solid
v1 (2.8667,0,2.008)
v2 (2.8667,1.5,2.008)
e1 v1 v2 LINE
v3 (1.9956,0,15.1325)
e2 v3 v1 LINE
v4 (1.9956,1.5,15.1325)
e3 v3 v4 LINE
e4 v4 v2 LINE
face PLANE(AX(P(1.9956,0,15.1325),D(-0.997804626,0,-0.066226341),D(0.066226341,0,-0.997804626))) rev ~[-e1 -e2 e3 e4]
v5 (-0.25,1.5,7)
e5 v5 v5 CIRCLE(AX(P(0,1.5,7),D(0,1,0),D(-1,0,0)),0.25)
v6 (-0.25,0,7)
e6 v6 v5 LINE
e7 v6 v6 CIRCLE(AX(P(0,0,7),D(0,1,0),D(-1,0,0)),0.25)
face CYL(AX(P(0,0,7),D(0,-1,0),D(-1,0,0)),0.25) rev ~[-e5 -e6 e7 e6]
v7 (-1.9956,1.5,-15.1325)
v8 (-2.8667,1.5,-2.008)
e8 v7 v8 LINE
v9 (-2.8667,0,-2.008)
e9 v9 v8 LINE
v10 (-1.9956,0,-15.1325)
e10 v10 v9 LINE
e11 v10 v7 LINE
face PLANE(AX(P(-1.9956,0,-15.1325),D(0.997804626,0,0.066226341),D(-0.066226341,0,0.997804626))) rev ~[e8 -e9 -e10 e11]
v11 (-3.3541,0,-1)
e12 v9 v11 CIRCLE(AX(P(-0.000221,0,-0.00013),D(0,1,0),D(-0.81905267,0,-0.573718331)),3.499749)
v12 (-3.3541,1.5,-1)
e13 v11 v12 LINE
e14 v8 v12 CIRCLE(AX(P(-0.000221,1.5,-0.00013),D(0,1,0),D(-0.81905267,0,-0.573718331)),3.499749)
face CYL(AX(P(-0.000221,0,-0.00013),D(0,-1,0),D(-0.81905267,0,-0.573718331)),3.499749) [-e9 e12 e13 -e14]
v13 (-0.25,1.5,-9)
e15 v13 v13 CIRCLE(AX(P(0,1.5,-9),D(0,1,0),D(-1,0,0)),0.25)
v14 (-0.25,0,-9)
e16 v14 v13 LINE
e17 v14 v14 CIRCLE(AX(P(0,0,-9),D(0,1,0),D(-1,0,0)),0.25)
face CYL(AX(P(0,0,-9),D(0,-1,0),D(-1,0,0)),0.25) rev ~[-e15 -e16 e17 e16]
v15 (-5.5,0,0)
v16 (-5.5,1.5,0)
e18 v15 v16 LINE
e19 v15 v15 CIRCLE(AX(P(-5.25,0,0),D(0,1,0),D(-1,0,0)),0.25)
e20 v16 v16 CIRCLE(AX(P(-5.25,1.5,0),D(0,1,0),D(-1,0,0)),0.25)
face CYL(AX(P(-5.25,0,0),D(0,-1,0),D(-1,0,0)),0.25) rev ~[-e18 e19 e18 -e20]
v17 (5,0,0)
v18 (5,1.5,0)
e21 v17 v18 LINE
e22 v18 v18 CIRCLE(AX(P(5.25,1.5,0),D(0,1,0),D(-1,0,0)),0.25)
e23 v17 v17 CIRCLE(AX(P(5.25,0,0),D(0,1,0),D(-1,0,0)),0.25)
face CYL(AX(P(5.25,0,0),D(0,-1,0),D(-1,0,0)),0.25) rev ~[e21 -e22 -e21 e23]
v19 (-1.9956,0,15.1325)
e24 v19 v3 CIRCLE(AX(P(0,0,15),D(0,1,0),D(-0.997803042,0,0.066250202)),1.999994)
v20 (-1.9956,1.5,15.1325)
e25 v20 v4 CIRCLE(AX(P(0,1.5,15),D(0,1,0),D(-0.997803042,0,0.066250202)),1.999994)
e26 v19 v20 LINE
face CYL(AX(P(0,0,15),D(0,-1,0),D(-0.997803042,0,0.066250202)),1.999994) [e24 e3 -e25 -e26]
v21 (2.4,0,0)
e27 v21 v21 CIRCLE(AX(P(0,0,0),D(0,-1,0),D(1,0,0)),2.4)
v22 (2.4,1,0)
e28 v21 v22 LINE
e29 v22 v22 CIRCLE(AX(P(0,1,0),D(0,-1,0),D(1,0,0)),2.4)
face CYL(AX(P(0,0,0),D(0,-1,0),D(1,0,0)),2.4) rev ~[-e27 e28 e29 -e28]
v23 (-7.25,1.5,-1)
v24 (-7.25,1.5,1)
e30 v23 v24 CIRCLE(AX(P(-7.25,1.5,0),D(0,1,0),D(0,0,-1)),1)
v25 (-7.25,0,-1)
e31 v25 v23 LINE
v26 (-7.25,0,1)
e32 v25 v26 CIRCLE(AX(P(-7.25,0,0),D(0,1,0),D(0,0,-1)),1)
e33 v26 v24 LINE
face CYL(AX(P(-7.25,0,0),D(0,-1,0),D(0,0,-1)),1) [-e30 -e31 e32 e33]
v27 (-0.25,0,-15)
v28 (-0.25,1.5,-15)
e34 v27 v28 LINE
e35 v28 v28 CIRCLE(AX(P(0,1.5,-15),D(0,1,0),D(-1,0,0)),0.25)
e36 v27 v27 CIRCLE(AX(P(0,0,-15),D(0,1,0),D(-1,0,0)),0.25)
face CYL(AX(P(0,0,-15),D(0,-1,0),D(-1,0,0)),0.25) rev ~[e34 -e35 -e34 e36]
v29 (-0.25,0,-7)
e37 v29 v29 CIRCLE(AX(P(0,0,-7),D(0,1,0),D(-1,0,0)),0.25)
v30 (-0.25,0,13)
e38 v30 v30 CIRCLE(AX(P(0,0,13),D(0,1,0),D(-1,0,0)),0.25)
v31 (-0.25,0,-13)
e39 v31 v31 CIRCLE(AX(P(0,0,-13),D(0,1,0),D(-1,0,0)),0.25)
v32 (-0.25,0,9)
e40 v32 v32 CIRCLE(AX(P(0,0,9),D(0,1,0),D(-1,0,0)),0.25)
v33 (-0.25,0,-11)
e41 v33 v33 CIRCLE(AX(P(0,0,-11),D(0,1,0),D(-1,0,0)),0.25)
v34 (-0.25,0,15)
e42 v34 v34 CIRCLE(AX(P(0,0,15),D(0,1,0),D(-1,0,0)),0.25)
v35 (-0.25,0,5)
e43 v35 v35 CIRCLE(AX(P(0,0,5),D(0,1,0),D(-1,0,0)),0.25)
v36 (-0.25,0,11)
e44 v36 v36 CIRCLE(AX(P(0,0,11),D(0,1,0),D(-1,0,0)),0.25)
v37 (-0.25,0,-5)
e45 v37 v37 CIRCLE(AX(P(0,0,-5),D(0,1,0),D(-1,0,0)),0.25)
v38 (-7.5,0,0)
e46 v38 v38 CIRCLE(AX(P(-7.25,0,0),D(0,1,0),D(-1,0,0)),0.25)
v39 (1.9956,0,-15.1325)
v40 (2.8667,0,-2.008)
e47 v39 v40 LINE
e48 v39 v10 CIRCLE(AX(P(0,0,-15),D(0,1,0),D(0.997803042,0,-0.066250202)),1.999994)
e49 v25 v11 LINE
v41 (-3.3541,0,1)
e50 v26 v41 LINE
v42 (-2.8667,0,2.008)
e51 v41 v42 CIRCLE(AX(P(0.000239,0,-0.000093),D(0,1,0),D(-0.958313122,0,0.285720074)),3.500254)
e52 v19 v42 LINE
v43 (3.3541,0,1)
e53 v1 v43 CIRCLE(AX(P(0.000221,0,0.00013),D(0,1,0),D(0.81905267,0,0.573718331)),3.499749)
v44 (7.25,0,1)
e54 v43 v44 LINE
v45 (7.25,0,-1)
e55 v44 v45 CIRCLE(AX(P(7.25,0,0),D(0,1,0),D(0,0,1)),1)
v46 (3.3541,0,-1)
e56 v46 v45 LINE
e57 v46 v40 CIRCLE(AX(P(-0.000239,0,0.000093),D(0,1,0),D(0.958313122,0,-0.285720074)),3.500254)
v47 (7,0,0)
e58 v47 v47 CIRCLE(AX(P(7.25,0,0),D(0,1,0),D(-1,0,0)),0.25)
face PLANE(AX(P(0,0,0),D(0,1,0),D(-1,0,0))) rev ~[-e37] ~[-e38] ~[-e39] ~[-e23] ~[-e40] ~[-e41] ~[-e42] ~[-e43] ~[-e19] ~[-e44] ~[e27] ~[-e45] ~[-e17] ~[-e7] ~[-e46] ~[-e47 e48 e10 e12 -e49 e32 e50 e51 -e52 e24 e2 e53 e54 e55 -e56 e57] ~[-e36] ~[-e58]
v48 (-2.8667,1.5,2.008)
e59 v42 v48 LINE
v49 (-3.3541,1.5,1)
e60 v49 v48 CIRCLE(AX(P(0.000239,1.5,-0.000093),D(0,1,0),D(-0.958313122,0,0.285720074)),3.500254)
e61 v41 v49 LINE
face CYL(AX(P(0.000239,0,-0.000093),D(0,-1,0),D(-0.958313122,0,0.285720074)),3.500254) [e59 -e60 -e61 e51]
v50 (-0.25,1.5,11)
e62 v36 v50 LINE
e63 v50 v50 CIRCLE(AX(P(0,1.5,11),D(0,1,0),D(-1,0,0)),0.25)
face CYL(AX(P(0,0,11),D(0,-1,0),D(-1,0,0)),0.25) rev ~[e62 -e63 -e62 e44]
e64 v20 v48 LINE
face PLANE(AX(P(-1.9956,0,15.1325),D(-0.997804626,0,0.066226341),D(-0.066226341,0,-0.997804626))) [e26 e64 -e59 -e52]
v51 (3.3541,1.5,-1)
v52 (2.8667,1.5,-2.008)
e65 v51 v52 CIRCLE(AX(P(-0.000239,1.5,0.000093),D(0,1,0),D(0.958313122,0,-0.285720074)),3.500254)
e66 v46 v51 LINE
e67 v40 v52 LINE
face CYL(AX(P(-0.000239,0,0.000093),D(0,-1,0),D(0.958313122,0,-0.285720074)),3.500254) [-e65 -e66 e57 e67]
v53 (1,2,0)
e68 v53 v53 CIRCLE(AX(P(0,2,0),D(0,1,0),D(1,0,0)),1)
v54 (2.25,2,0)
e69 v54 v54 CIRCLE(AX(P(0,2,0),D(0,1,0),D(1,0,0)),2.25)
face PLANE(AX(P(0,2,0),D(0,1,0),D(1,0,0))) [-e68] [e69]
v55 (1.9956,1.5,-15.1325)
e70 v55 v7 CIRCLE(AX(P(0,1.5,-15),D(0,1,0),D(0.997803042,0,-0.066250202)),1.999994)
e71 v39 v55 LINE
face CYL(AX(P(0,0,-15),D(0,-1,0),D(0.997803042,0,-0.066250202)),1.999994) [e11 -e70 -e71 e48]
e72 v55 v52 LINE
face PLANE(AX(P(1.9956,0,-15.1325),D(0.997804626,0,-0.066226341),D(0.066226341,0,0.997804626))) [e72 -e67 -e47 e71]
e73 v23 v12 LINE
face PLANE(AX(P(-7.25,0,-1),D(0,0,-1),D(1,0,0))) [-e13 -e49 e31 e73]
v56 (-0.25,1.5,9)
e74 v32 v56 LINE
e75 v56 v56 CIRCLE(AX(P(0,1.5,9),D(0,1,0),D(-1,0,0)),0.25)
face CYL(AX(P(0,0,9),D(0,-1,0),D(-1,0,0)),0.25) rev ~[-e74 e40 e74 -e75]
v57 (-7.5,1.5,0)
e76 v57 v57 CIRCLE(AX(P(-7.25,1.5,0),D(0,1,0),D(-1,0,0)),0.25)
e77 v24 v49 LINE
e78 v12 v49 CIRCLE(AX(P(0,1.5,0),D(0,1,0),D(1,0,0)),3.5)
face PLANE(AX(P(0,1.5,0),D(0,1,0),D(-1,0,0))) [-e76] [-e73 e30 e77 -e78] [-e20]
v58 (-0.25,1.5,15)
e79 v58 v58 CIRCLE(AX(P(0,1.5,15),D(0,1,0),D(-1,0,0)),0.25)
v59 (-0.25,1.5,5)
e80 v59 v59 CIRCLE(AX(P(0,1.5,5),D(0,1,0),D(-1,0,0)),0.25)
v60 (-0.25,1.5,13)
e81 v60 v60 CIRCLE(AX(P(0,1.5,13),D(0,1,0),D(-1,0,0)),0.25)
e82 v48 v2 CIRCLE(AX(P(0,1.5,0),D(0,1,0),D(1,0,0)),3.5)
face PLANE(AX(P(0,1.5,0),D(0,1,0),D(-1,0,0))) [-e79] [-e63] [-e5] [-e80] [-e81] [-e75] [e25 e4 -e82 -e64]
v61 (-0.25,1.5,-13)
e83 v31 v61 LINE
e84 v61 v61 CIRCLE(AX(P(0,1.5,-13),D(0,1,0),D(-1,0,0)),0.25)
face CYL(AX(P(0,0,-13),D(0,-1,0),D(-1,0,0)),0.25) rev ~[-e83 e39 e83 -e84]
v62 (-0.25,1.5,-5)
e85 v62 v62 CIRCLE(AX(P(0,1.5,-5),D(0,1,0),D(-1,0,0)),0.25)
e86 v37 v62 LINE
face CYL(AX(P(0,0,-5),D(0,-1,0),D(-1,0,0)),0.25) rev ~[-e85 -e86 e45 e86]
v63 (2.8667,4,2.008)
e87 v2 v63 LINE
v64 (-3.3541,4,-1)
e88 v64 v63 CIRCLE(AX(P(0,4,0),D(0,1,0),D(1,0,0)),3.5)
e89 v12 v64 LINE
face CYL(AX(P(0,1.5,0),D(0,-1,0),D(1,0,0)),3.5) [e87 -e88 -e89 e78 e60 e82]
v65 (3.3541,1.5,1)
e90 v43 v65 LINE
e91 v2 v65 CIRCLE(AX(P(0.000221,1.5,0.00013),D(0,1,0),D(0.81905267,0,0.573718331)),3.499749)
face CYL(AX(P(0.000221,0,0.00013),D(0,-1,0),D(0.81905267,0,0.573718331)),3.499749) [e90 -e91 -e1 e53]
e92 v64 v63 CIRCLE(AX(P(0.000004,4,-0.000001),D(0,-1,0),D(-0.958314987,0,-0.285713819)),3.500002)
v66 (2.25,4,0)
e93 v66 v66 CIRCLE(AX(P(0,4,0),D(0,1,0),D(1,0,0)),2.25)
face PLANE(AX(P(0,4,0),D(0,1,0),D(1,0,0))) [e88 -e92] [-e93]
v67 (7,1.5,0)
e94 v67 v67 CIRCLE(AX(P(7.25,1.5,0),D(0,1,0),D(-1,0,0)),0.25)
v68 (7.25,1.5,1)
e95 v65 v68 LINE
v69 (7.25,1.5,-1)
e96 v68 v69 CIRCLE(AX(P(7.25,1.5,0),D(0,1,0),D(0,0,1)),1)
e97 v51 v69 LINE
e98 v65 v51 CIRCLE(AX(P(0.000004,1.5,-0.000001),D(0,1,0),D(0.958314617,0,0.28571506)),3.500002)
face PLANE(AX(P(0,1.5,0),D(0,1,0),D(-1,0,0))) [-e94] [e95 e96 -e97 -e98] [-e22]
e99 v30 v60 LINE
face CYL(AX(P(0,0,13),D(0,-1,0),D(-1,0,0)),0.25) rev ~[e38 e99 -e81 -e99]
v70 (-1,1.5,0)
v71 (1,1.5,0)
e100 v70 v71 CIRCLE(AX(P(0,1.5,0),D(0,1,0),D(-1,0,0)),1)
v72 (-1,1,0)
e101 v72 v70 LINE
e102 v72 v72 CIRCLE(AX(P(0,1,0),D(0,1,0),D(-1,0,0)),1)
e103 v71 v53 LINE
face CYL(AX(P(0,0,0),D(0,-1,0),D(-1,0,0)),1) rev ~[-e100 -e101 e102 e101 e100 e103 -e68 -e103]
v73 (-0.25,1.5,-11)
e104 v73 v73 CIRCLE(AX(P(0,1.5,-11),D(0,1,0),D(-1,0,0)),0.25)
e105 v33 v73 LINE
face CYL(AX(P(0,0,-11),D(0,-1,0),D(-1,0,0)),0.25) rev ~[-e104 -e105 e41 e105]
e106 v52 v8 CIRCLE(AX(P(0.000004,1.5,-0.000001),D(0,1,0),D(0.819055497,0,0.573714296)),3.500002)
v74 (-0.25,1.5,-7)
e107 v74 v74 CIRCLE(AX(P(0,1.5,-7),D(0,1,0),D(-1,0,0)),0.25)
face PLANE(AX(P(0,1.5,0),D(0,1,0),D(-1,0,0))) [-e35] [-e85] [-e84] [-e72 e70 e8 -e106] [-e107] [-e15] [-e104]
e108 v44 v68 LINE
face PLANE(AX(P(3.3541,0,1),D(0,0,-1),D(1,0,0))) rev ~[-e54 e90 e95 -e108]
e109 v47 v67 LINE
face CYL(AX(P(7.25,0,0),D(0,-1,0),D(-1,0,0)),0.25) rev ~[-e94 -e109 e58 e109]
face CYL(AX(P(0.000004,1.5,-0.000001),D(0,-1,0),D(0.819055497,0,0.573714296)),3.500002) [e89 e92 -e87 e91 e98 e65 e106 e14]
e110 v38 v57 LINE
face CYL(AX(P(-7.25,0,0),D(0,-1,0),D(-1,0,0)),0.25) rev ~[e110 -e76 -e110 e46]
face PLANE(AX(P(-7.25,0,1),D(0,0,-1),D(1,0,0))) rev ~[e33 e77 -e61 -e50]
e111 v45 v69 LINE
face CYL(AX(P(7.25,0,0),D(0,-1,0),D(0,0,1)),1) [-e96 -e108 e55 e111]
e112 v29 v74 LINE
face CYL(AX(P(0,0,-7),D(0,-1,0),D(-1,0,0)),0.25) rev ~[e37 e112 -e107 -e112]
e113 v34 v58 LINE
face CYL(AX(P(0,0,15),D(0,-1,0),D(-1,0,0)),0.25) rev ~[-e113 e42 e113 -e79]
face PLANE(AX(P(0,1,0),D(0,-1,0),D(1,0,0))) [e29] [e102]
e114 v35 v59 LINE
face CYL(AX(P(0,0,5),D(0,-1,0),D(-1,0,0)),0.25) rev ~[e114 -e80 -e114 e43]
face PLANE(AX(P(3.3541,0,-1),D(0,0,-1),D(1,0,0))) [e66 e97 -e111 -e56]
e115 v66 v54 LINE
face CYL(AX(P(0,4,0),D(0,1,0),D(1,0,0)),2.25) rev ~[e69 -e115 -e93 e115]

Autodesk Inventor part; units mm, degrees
ref_plane "XZ Plane" through (0, 0, 0) normal (0, 1, 0) x (-1, 0, 0)
ref_plane "XY Plane" through (0, 0, 0) normal (0, 0, 1) x (1, 0, 0)
sketch "Эскиз1" plane through (0, 0, 0) normal (0, 1, 0) x (-1, 0, 0)
  circle A0 centre (0, 0) radius 1
  arc A1 (1.9956, 15.1325) -> (-1.9956, 15.1325) centre (0, 15) ccw
  line L0 (1.9956, 15.1325) -> (2.8667, 2.008)
  line L1 (-1.9956, 15.1325) -> (-2.8667, 2.008)
  circle A2 centre (0, 15) radius 0.25
  circle A3 centre (0, 13) radius 0.25
  circle A4 centre (0, 11) radius 0.25
  circle A5 centre (0, 9) radius 0.25
  circle A6 centre (0, 7) radius 0.25
  circle A7 centre (0, 5) radius 0.25
  line L2 (2.8667, 2.008) -> (3, 0) construction
  line L3 (-2.8667, 2.008) -> (-3, 0) construction
  line L4 (-13.6979, 0) -> (13.2438, 0) construction
  arc A8 (-1.9956, -15.1325) -> (1.9956, -15.1325) centre (0, -15) ccw
  line L5 (1.9956, -15.1325) -> (2.8667, -2.008)
  line L6 (-1.9956, -15.1325) -> (-2.8667, -2.008)
  circle A9 centre (0, -15) radius 0.25
  circle A10 centre (0, -13) radius 0.25
  circle A11 centre (0, -11) radius 0.25
  circle A12 centre (0, -9) radius 0.25
  circle A13 centre (0, -7) radius 0.25
  circle A14 centre (0, -5) radius 0.25
  line L7 (2.8667, -2.008) -> (3, 0) construction
  line L8 (-2.8667, -2.008) -> (-3, 0) construction
  arc A15 (7.25, -1) -> (7.25, 1) centre (7.25, 0) ccw
  arc A16 (-7.25, 1) -> (-7.25, -1) centre (-7.25, 0) ccw
  arc A17 (2.8667, -2.008) -> (3.3541, -1) centre (0, 0) ccw
  arc A18 (3.3541, 1) -> (2.8667, 2.008) centre (0, 0) ccw
  arc A19 (-2.8667, 2.008) -> (-3.3541, 1) centre (0, 0) ccw
  arc A20 (-3.3541, -1) -> (-2.8667, -2.008) centre (0, 0) ccw
  line L9 (7.25, 1) -> (3.3541, 1)
  line L10 (-3.3541, 1) -> (-7.25, 1)
  line L11 (7.25, -1) -> (3.3541, -1)
  line L12 (-3.3541, -1) -> (-7.25, -1)
  circle A21 centre (7.25, 0) radius 0.25
  circle A22 centre (-7.25, 0) radius 0.25
  circle A23 centre (-5.25, 0) radius 0.25
  circle A24 centre (5.25, 0) radius 0.25
  dimension "d1" = 2
  dimension "d2" = 3
  dimension "d3" = 3
  dimension "d4" = 15
  dimension "d5" = 2
  dimension "d6" = 0.5
  dimension "d7" = 0.5
  dimension "d8" = 0.5
  dimension "d9" = 0.5
  dimension "d10" = 0.5
  dimension "d11" = 0.5
  dimension "d13" = 2
  dimension "d14" = 2
  dimension "d15" = 2
  dimension "d16" = 2
  dimension "d17" = 2
  dimension "d32" = 2
  dimension "d33" = 2
  dimension "d34" = 14.5
  dimension "d35" = 7.25
  dimension "d36" = 0.5
  dimension "d37" = 0.5
  dimension "d38" = 0.5
  dimension "d39" = 0.5
  dimension "d40" = 2
  dimension "d41" = 2
extrude "Выдавливание1" add sketch "Эскиз1" along normal blind 1.5
sketch "Эскиз2" plane through (0, 1.5, 0) normal (0, 1, 0) x (1, 0, 0)
  arc A0 (2.8667, -2.008) -> (-3.3541, 1) centre (0, 0) ccw projected
  circle A1 centre (0, 0) radius 1 projected
  circle A2 centre (0, 0) radius 3.5
  point P0 (-2.8667, -2.008)
extrude "Выдавливание2" add sketch "Эскиз2" along normal blind 2.5
sketch "Эскиз3" plane through (0, 4, 0) normal (0, 1, 0) x (1, 0, 0)
  circle A0 centre (0, 0) radius 1 projected
  circle A1 centre (0, 0) radius 2.25
  dimension "d23" = 4.5
extrude "Выдавливание3" cut sketch "Эскиз3" against normal blind 2
sketch "Эскиз4" plane through (0, 0, 0) normal (0, -1, 0) x (1, 0, 0)
  circle A0 centre (0, 0) radius 2.4
  dimension "d29" = 4.8
extrude "Выдавливание4" cut sketch "Эскиз4" against normal blind 1
equation "\"d7\" = d6"
equation "\"d8\" = d6"
equation "\"d9\" = d6"
equation "\"d10\" = d6"
equation "\"d11\" = d6"
equation "\"d35\" = 0.5 * d34"
properties part number "Arm 3" material "Нейлон 6/6"
